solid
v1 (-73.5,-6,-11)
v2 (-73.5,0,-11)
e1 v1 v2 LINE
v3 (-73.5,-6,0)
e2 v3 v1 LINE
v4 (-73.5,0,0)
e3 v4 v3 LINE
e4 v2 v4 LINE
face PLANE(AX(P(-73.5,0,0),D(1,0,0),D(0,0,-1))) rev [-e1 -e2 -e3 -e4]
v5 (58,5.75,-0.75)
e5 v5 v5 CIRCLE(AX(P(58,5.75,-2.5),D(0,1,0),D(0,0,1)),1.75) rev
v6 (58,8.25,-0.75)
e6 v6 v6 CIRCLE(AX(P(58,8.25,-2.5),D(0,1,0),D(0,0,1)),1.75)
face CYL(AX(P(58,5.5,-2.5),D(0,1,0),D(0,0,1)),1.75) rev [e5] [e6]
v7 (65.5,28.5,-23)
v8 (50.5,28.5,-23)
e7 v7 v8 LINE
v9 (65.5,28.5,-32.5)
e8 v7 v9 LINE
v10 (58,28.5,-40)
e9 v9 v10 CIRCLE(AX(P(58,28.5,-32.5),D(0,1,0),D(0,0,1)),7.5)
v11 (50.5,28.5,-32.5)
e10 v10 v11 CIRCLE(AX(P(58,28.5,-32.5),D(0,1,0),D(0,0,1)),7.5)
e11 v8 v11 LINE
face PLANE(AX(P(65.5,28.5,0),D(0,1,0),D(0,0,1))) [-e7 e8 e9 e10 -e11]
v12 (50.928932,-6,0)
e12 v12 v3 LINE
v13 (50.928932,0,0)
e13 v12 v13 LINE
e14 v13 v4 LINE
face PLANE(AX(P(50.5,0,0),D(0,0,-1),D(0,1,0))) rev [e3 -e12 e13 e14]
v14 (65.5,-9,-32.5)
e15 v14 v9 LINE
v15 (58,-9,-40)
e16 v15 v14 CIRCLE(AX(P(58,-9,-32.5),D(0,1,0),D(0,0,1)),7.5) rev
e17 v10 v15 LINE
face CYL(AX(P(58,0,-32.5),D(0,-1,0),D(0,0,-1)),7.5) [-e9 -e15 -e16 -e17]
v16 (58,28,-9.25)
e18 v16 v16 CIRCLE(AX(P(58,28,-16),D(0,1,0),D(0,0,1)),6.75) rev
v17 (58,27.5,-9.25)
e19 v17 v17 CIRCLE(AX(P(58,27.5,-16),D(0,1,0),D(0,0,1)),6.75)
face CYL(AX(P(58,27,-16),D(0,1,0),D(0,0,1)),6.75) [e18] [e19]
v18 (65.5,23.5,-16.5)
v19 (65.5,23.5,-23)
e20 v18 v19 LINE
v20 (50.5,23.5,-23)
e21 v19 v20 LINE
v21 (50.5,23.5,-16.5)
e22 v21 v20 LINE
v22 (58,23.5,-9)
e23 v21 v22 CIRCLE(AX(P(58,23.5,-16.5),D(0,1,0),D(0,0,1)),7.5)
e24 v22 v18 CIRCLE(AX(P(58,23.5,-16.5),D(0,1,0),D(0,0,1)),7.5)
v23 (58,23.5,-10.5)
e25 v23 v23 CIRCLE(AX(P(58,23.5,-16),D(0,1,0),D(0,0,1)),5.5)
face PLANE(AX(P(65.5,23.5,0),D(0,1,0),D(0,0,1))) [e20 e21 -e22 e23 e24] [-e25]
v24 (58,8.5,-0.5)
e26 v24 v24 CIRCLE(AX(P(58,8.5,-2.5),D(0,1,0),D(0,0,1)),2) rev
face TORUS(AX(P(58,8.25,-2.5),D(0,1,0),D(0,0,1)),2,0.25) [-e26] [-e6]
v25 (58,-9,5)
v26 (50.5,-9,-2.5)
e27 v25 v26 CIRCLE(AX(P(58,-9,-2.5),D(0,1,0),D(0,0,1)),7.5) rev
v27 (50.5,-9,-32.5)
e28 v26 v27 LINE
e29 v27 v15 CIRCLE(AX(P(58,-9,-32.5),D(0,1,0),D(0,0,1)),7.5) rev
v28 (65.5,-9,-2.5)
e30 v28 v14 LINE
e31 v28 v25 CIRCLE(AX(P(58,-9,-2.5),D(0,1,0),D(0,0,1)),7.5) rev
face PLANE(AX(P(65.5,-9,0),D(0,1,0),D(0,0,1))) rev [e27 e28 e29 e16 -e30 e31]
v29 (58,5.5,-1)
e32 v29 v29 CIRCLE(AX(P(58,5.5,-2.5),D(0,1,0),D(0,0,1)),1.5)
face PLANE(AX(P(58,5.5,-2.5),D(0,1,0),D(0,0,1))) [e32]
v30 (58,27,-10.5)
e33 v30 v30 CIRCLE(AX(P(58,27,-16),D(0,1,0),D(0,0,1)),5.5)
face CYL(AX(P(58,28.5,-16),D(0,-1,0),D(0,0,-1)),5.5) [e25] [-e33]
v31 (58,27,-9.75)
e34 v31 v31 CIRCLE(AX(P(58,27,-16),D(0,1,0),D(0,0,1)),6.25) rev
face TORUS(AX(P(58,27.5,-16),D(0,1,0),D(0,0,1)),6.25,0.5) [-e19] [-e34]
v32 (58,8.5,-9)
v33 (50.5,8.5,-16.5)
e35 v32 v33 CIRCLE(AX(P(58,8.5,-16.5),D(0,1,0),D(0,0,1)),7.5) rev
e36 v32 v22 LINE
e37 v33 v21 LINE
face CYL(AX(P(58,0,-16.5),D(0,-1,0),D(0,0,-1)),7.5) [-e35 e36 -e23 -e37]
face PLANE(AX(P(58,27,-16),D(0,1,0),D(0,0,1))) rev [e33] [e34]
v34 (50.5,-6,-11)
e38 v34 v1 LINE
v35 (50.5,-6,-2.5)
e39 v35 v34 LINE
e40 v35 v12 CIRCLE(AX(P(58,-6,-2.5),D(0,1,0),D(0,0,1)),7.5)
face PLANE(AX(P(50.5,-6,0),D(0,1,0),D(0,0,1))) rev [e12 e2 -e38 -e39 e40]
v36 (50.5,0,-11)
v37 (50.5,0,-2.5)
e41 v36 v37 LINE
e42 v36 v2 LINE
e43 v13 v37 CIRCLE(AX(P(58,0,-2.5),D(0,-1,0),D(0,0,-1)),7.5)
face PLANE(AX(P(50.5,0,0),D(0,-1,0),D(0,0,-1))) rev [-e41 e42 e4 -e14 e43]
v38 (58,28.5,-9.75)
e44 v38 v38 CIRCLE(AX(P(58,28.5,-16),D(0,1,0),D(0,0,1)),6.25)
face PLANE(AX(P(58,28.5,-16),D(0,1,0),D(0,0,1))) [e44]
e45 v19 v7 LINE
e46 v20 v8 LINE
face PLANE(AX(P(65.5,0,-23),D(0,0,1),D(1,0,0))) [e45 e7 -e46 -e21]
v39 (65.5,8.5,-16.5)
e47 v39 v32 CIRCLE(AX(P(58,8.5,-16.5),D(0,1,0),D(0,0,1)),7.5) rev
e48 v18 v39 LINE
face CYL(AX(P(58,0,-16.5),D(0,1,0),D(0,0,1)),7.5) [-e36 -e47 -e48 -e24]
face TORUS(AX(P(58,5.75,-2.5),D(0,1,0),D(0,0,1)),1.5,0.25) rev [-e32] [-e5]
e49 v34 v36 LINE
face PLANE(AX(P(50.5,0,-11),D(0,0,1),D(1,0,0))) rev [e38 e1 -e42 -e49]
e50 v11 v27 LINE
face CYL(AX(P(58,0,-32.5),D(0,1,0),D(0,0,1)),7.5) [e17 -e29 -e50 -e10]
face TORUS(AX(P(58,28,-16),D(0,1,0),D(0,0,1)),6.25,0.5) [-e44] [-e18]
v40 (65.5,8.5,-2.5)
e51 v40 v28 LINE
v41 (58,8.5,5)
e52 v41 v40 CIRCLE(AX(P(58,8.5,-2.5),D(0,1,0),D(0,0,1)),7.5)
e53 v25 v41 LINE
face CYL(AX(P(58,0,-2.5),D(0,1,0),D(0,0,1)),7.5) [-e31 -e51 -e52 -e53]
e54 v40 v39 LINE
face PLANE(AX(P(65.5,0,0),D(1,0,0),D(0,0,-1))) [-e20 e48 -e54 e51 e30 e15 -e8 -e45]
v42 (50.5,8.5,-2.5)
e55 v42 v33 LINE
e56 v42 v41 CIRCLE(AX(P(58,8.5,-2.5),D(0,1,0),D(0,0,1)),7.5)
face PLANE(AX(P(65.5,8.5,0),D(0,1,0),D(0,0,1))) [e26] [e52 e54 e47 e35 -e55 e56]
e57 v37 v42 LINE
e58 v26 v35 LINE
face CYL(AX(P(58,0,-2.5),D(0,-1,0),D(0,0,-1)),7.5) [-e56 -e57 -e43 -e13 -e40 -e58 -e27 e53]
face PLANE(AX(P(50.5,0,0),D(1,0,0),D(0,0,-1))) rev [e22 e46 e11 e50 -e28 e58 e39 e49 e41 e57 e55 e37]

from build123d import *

# Parameters (mm, degrees)
BOSS_EXTRUDE1_START = -73.5
SKETCH1_W           = 11
SKETCH1_H           = 6
BOSS_EXTRUDE1_DEPTH = 124
SKETCH2_W           = 11
SKETCH2_H           = 6
BOSS_EXTRUDE3_DEPTH = 15
FILLET1_R           = 7.5
SKETCH4_R           = 5.5
BOSS_EXTRUDE4_DEPTH = 5
SKETCH5_R           = 6.75
BOSS_EXTRUDE5_DEPTH = 1.5
FILLET2_R           = 0.5
SKETCH6_R           = 1.75
CUT_EXTRUDE1_DEPTH  = 3
FILLET3_R           = 0.25


with BuildPart() as part:
    # Sketch1 → Boss-Extrude1 (new body)
    with BuildSketch(Plane(origin=(0, 0, 0), x_dir=(0, 0, -1), z_dir=(1, 0, 0)).offset(BOSS_EXTRUDE1_START)):
        with Locations((5.5, -3)):
            Rectangle(SKETCH1_W, SKETCH1_H)
    extrude(amount=BOSS_EXTRUDE1_DEPTH)

    # Sketch2 → Boss-Extrude3 (add)
    # profile 1 of 2: a face of its own
    with BuildSketch(Plane(origin=(50.5, 0, 0), x_dir=(0, 0, -1), z_dir=(1, 0, 0))):
        Polygon((-5, 8.5), (-5, -9), (40, -9), (40, 28.5), (23, 28.5), (23, 23.5), (9, 23.5), (9, 8.5), align=None)
        with Locations((5.5, -3)):
            Rectangle(SKETCH2_W, SKETCH2_H, mode=Mode.SUBTRACT)
    # profile 2 of 2: a face of its own
    with BuildSketch(Plane(origin=(50.5, 0, 0), x_dir=(0, 0, -1), z_dir=(1, 0, 0))):
        with Locations((5.5, -3)):
            Rectangle(SKETCH2_W, SKETCH2_H)
    extrude(amount=BOSS_EXTRUDE3_DEPTH)

    # Fillet1
    # the kernel refuses this fillet: 7.5 mm, written as the material it takes off along each edge
    with BuildSketch(Plane(origin=(50.5, 27.25, 5), x_dir=(1, 0, 0), z_dir=(0, -1, 0))) as fillet1_piece_1_section:
        with BuildLine():
            CenterArc((FILLET1_R, -FILLET1_R), FILLET1_R, 90, 90)
            Line((0, -FILLET1_R), (0, 0))
            Line((0, 0), (FILLET1_R, 0))
        make_face()
    fillet1_piece_1 = extrude(amount=55, mode=Mode.PRIVATE)
    fillet1_piece_1 = split(fillet1_piece_1, bisect_by=Plane(origin=(52.221902298, 4.25, 0), z_dir=(0, 0, 1)), keep=Keep.TOP, mode=Mode.PRIVATE)
    add(fillet1_piece_1, mode=Mode.SUBTRACT)
    with BuildSketch(Plane(origin=(50.5, 27.25, 5), x_dir=(1, 0, 0), z_dir=(0, -1, 0))) as fillet1_piece_2_section:
        with BuildLine():
            CenterArc((FILLET1_R, -FILLET1_R), FILLET1_R, 90, 90)
            Line((0, -FILLET1_R), (0, 0))
            Line((0, 0), (FILLET1_R, 0))
        make_face()
    fillet1_piece_2 = extrude(amount=55, mode=Mode.PRIVATE)
    fillet1_piece_2 = split(fillet1_piece_2, bisect_by=Plane(origin=(50.628023306, 0, -0.621369721), z_dir=(0, 1, 0)), keep=Keep.TOP, mode=Mode.PRIVATE)
    add(fillet1_piece_2, mode=Mode.SUBTRACT)
    with BuildSketch(Plane(origin=(50.5, 27.25, 5), x_dir=(1, 0, 0), z_dir=(0, -1, 0))) as fillet1_piece_3_section:
        with BuildLine():
            CenterArc((FILLET1_R, -FILLET1_R), FILLET1_R, 90, 90)
            Line((0, -FILLET1_R), (0, 0))
            Line((0, 0), (FILLET1_R, 0))
        make_face()
    fillet1_piece_3 = extrude(amount=55, mode=Mode.PRIVATE)
    fillet1_piece_3 = split(fillet1_piece_3, bisect_by=Plane(origin=(50.628023306, -6, -0.621369721), z_dir=(0, -1, 0)), keep=Keep.TOP, mode=Mode.PRIVATE)
    add(fillet1_piece_3, mode=Mode.SUBTRACT)
    with BuildSketch(Plane(origin=(65.5, 27.25, 5), x_dir=(-1, 0, 0), z_dir=(0, -1, 0))) as fillet1_piece_4:
        with BuildLine():
            CenterArc((FILLET1_R, FILLET1_R), FILLET1_R, 180, 90)
            Line((0, FILLET1_R), (0, 0))
            Line((0, 0), (FILLET1_R, 0))
        make_face()
    extrude(amount=55, mode=Mode.SUBTRACT)
    with BuildSketch(Plane(origin=(50.5, 42.25, -9), x_dir=(0, 0, -1), z_dir=(0, -1, 0))) as fillet1_piece_5:
        with BuildLine():
            CenterArc((FILLET1_R, FILLET1_R), FILLET1_R, 180, 90)
            Line((0, FILLET1_R), (0, 0))
            Line((0, 0), (FILLET1_R, 0))
        make_face()
    extrude(amount=33.75, mode=Mode.SUBTRACT)
    with BuildSketch(Plane(origin=(65.5, 42.25, -9), x_dir=(0, 0, -1), z_dir=(0, -1, 0))) as fillet1_piece_6:
        with BuildLine():
            CenterArc((FILLET1_R, -FILLET1_R), FILLET1_R, 90, 90)
            Line((0, -FILLET1_R), (0, 0))
            Line((0, 0), (FILLET1_R, 0))
        make_face()
    extrude(amount=33.75, mode=Mode.SUBTRACT)
    with BuildSketch(Plane(origin=(50.5, -27.75, -40), x_dir=(0, 0, 1), z_dir=(0, 1, 0))) as fillet1_piece_7:
        with BuildLine():
            CenterArc((FILLET1_R, FILLET1_R), FILLET1_R, 180, 90)
            Line((0, FILLET1_R), (0, 0))
            Line((0, 0), (FILLET1_R, 0))
        make_face()
    extrude(amount=75, mode=Mode.SUBTRACT)
    with BuildSketch(Plane(origin=(65.5, -27.75, -40), x_dir=(0, 0, 1), z_dir=(0, 1, 0))) as fillet1_piece_8:
        with BuildLine():
            CenterArc((FILLET1_R, -FILLET1_R), FILLET1_R, 90, 90)
            Line((0, -FILLET1_R), (0, 0))
            Line((0, 0), (FILLET1_R, 0))
        make_face()
    extrude(amount=75, mode=Mode.SUBTRACT)

    # Sketch4 → Boss-Extrude4 (add)
    with BuildSketch(Plane(origin=(0, 23.5, 0), x_dir=(1, 0, 0), z_dir=(0, 1, 0))):
        with Locations(Location((58, 16, 0), (0, 0, 270))):
            Circle(SKETCH4_R)
    extrude(amount=BOSS_EXTRUDE4_DEPTH)

    # Sketch5 → Boss-Extrude5 (add)
    with BuildSketch(Plane(origin=(0, 28.5, 0), x_dir=(1, 0, 0), z_dir=(0, 1, 0))):
        with Locations(Location((58, 16, 0), (0, 0, 270))):
            Circle(SKETCH5_R)
    extrude(amount=-BOSS_EXTRUDE5_DEPTH)

    # Fillet2
    fillet2_edges = [part.edges().sort_by_distance(p)[0] for p in [
        (58, 27, -22.75),
        (58, 28.5, -22.75),
    ]]
    fillet(fillet2_edges, radius=FILLET2_R)

    # Sketch6 → Cut-Extrude1 (cut)
    with BuildSketch(Plane(origin=(0, 8.5, 0), x_dir=(1, 0, 0), z_dir=(0, 1, 0))):
        with Locations(Location((58, 2.5, 0), (0, 0, 270))):
            Circle(SKETCH6_R)
    extrude(amount=-CUT_EXTRUDE1_DEPTH, mode=Mode.SUBTRACT)

    # Fillet3
    fillet3_edges = [part.edges().sort_by_distance(p)[0] for p in [
        (58, 5.5, -4.25),
        (58, 8.5, -4.25),
    ]]
    fillet(fillet3_edges, radius=FILLET3_R)


solid = part.part
